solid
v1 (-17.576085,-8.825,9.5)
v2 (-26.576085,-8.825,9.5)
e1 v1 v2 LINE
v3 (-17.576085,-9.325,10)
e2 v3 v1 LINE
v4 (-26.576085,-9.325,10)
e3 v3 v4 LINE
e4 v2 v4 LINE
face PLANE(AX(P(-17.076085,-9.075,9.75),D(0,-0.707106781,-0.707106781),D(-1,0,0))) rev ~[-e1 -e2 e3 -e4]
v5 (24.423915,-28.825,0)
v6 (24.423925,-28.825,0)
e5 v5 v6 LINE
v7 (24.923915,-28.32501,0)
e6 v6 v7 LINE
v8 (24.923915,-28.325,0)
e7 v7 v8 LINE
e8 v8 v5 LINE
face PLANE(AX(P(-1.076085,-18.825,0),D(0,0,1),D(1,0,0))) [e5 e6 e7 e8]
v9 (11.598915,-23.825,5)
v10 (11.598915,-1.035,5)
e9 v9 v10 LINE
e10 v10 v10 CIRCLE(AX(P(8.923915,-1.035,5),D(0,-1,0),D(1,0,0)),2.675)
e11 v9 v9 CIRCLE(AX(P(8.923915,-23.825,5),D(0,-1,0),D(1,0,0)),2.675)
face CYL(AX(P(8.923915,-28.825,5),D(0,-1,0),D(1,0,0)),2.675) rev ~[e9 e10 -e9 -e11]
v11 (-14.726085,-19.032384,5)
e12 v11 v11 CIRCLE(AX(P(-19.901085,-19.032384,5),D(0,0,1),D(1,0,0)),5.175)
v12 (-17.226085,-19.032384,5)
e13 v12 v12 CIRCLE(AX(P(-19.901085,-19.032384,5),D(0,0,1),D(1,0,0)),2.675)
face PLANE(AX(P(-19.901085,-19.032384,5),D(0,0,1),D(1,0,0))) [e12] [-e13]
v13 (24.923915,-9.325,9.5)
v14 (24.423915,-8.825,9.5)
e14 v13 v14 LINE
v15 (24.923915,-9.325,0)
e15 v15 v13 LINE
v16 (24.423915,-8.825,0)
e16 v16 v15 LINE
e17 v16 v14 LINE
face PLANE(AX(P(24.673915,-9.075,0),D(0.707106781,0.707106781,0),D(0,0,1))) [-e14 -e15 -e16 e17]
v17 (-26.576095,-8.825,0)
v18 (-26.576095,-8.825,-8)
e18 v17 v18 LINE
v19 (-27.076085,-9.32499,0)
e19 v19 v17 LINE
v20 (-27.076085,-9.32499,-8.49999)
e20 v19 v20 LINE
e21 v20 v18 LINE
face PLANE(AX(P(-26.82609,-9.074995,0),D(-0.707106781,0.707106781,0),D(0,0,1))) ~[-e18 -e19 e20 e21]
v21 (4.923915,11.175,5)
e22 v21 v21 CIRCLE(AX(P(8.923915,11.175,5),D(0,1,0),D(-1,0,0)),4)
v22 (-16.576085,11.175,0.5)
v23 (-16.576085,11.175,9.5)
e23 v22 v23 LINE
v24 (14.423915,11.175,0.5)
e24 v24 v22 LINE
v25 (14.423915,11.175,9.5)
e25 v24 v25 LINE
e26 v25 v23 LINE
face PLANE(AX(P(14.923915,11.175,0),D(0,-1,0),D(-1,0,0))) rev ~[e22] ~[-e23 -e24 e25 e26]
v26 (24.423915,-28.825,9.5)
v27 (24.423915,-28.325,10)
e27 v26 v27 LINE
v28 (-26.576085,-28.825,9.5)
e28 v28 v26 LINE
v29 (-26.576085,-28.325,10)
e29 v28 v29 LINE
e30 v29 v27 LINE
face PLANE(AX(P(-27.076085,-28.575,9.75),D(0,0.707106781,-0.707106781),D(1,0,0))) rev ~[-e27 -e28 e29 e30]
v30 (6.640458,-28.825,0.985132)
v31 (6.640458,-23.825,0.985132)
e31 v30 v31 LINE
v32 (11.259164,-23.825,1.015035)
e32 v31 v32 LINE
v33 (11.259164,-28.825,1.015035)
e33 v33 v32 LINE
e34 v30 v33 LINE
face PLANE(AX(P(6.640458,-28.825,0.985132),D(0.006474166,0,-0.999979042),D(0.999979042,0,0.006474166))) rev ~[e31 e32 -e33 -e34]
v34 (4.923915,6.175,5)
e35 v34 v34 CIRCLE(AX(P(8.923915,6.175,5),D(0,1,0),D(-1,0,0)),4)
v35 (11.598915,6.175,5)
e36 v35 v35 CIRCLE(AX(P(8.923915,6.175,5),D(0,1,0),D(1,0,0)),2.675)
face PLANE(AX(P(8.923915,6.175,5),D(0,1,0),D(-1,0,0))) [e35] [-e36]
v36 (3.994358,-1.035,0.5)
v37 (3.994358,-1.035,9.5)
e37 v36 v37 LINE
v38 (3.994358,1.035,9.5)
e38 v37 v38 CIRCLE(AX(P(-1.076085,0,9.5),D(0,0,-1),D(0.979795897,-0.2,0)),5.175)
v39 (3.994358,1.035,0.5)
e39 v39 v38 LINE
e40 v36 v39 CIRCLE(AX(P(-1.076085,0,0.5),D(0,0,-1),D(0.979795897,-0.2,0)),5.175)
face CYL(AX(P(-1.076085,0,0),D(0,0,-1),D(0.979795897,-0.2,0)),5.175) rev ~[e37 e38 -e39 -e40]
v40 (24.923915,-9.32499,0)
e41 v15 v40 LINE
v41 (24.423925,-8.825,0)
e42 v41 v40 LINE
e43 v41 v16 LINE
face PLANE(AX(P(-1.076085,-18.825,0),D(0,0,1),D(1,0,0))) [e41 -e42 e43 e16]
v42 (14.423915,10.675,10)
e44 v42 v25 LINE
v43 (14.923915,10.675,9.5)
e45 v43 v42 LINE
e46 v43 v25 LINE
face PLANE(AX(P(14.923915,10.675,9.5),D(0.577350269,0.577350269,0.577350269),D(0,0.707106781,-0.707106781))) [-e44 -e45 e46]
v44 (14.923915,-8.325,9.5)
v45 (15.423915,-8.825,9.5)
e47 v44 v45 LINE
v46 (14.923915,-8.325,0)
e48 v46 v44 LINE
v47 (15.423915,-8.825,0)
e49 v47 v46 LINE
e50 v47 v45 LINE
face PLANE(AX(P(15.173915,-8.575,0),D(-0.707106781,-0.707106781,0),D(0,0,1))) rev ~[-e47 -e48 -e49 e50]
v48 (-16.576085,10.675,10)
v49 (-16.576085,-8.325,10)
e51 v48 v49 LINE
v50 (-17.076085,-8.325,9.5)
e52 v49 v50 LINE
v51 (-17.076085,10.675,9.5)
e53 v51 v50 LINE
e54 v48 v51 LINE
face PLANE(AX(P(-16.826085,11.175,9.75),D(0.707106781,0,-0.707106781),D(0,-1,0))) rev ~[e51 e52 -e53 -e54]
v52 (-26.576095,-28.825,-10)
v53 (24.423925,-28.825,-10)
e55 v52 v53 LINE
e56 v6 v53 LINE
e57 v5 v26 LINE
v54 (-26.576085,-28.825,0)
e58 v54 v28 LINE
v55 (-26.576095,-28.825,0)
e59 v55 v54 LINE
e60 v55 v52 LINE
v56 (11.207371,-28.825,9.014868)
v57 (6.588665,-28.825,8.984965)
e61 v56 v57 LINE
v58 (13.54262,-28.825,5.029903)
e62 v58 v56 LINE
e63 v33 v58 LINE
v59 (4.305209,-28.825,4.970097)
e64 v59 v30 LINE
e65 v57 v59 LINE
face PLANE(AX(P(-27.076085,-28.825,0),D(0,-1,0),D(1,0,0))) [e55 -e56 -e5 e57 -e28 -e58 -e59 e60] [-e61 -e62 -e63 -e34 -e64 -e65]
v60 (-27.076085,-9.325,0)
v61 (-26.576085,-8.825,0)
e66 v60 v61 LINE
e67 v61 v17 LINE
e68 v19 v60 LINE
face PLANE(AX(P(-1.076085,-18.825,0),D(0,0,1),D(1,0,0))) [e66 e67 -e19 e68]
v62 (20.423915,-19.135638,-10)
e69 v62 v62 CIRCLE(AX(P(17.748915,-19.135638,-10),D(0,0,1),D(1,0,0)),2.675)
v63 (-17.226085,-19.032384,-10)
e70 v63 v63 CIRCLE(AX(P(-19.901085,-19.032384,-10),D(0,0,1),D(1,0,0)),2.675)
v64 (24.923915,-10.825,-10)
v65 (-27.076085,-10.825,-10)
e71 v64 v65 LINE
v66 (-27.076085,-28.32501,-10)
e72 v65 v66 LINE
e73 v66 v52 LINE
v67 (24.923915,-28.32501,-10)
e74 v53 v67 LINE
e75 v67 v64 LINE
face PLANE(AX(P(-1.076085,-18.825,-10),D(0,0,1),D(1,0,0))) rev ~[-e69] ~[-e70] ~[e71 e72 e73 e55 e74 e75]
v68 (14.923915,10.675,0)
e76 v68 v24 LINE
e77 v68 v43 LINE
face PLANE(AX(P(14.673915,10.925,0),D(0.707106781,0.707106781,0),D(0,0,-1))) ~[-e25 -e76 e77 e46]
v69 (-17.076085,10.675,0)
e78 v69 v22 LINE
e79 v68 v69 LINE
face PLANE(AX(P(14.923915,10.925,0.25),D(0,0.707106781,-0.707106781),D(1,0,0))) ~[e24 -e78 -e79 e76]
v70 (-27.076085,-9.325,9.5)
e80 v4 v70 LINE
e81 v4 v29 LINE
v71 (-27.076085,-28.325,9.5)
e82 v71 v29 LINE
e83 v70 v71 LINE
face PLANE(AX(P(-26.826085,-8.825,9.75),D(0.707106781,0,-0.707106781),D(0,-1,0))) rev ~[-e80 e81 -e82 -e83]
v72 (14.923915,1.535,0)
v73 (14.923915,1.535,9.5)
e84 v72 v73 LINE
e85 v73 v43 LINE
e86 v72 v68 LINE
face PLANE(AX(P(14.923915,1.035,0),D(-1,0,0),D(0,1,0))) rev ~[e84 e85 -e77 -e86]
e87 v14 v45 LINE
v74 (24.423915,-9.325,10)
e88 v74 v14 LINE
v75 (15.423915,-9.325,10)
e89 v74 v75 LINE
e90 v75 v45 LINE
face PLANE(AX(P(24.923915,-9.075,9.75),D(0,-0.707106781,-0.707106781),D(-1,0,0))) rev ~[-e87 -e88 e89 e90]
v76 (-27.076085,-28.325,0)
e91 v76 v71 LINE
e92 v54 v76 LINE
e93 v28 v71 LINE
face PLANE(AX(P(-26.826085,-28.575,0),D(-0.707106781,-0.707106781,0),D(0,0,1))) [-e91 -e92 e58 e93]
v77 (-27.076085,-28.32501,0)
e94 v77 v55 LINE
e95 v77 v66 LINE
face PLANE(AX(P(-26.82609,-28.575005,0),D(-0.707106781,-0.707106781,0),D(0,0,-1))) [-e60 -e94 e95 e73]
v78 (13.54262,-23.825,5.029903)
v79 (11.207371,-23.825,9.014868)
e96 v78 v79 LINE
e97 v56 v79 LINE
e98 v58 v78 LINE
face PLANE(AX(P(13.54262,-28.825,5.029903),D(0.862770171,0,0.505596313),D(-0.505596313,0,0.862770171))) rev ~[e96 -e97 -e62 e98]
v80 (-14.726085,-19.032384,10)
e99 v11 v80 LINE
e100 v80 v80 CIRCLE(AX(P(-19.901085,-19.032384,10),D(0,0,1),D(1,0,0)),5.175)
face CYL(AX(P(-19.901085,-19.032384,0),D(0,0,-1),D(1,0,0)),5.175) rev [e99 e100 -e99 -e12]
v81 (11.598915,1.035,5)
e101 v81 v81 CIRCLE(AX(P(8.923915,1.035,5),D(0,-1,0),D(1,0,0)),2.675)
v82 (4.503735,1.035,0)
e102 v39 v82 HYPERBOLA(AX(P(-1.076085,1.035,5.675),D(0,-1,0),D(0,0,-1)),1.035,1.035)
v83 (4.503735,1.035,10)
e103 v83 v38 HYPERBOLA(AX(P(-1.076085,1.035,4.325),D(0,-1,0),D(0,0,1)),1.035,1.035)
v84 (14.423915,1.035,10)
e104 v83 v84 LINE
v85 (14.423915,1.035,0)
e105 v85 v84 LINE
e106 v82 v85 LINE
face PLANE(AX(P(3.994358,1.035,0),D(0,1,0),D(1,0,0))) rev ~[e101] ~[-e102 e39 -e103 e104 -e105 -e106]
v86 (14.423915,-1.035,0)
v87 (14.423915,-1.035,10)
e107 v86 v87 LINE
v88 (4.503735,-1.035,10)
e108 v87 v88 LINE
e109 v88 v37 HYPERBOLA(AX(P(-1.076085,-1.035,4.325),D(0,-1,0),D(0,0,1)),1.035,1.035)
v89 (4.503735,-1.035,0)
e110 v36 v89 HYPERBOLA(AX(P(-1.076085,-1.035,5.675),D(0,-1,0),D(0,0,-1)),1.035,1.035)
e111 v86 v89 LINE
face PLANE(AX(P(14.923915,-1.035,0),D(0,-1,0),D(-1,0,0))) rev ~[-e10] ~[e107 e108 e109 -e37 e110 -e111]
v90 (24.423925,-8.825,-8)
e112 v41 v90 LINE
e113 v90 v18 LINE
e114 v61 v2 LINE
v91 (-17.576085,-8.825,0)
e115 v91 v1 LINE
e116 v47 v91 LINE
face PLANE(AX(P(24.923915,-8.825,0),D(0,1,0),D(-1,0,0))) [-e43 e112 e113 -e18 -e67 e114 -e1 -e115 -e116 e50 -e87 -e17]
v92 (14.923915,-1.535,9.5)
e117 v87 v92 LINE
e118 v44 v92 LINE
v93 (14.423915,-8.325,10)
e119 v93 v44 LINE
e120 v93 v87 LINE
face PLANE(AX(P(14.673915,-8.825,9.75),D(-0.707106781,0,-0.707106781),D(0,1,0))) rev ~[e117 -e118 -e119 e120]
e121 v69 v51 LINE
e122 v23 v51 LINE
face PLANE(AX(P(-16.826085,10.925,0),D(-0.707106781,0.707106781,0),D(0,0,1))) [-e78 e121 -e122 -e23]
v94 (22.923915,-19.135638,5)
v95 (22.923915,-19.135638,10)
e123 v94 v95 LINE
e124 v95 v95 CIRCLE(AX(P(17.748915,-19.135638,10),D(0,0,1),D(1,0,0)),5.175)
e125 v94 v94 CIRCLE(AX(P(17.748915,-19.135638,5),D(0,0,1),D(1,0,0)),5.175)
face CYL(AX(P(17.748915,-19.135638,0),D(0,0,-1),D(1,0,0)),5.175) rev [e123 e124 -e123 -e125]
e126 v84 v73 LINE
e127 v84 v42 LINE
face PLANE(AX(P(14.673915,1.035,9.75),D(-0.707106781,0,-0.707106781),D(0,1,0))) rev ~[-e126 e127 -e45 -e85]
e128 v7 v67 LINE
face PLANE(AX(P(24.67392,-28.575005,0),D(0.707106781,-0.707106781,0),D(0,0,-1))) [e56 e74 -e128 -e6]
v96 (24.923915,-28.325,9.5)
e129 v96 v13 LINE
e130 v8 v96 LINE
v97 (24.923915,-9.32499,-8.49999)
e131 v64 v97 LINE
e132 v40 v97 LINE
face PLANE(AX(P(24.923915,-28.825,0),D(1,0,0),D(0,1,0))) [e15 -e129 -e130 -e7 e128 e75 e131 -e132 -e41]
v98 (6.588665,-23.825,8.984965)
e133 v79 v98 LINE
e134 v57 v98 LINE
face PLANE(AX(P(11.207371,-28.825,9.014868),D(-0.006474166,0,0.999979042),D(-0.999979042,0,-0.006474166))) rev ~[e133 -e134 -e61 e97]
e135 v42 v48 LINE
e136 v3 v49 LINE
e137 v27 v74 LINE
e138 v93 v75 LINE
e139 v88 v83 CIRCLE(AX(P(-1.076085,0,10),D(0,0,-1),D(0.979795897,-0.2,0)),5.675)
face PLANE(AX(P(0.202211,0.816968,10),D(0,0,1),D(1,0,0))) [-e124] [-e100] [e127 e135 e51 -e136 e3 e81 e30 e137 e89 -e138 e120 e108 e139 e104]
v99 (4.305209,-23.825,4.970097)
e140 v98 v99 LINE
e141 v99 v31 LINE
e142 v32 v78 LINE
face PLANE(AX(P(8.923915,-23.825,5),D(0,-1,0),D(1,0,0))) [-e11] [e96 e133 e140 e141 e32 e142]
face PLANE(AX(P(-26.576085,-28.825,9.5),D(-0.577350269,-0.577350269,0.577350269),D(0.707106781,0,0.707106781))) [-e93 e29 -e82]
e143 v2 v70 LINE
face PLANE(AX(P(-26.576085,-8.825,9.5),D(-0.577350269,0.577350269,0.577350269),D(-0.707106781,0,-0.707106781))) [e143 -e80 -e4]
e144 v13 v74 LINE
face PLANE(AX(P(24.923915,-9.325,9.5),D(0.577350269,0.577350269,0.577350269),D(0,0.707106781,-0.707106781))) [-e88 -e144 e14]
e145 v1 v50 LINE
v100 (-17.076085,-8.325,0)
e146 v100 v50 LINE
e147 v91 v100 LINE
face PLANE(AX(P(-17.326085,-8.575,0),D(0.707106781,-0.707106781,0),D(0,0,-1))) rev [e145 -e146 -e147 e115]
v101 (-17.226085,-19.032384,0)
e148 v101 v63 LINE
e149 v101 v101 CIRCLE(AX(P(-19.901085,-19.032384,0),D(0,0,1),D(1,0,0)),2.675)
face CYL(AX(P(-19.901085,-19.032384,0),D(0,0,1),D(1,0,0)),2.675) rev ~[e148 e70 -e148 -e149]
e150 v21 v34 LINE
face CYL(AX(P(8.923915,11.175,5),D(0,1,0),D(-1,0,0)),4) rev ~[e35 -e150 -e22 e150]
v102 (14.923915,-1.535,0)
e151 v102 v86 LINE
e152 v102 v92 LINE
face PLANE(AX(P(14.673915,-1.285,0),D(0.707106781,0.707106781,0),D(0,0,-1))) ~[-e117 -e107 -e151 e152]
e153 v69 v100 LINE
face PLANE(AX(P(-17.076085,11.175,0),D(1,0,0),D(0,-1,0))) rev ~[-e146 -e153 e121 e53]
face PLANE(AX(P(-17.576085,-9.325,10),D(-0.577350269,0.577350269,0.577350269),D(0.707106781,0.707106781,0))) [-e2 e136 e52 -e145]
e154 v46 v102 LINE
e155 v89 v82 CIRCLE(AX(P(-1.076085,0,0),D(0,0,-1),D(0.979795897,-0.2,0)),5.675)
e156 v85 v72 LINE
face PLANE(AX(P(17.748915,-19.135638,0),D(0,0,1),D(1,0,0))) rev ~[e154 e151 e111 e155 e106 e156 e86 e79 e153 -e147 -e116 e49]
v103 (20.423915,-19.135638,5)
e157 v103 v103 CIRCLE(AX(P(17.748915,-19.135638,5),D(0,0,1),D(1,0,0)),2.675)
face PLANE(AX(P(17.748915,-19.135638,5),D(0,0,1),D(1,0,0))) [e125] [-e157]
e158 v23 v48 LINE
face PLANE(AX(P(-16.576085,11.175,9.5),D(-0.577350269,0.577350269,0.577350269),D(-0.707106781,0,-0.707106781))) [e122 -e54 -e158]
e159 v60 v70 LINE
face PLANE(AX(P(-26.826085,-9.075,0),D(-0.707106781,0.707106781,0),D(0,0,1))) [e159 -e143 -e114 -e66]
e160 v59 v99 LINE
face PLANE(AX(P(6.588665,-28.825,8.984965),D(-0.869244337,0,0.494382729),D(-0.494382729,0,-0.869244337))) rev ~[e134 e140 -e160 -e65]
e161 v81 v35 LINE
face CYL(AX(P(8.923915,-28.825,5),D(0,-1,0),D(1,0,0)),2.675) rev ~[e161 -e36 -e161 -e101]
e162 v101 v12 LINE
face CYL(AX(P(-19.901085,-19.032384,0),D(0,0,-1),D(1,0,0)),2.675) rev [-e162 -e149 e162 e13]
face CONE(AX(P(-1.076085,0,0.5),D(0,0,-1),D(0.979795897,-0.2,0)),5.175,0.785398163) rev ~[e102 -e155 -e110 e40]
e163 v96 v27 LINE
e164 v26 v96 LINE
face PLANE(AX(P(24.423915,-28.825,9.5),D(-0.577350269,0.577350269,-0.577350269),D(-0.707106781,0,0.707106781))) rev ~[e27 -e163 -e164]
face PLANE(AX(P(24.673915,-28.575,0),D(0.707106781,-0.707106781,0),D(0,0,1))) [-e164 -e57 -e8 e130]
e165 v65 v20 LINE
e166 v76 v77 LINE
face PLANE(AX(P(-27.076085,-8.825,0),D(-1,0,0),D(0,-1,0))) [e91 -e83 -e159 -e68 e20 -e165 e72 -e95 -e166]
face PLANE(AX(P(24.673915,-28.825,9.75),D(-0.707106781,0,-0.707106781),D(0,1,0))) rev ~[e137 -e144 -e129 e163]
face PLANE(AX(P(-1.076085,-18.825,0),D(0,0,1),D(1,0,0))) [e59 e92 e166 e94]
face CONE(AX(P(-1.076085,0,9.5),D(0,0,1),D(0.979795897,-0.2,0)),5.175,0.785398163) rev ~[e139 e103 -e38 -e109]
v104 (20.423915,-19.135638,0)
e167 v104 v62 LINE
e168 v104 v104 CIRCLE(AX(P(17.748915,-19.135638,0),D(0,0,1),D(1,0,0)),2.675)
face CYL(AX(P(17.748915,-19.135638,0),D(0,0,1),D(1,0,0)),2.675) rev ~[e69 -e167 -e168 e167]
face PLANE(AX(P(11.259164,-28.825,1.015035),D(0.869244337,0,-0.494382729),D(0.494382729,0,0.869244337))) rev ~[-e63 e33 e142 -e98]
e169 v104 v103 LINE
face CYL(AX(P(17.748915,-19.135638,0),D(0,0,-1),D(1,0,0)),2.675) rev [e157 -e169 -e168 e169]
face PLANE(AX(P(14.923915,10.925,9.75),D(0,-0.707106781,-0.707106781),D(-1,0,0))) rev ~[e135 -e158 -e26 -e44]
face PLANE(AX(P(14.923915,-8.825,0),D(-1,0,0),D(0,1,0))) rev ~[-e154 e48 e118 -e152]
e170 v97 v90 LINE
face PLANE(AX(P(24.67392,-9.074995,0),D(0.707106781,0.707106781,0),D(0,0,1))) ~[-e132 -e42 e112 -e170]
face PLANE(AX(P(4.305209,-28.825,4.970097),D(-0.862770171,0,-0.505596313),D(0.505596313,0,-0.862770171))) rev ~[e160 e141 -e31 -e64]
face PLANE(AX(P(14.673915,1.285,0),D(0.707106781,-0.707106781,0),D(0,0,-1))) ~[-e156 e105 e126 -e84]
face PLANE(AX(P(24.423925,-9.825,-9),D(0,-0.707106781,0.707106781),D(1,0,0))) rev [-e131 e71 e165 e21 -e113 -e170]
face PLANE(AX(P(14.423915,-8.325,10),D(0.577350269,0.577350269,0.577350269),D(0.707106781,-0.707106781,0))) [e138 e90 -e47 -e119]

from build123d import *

# Parameters (mm, degrees)
F0_R      = 5.175
F1_DEPTH  = 10
F0_R_2    = 2.675
F2_DEPTH  = 5
F3_DEPTH  = 5
F4_R      = 2.675
F5_DEPTH  = 40
F6_DEPTH  = 5
F7_R      = 4
F7_R_2    = 2.675
F8_DEPTH  = 5
F9_SIZE   = 0.5
F10_DEPTH = 10
F11_DEPTH = 10
F12_SIZE  = 0.49999
F13_SIZE  = 2


# Not quite as in the source:
# - a fillet or chamfer is up to 0.001 mm smaller than in the source, because OpenCascade refuses the exact size


with BuildPart() as f1:
    # F0 (on Top) → F1 (new body)
    with BuildSketch(Plane.XY):
        with BuildLine():
            Line((14.923914507, 11.175), (-17.076085493, 11.175))
            Line((-17.076085493, 11.175), (-17.076085493, -8.825))
            Line((-17.076085493, -8.825), (14.923914507, -8.825))
            Line((14.923914507, -8.825), (14.923914507, -1.035))
            Line((14.923914507, -1.035), (3.9943582746, -1.035))
            ThreePointArc((3.9943582746, -1.035), (-6.251085493, 0), (3.9943582746, 1.035))
            Line((3.9943582746, 1.035), (14.923914507, 1.035))
            Line((14.923914507, 1.035), (14.923914507, 11.175))
        make_face()
        Polygon((14.923914507, -8.825), (-17.076085493, -8.825), (-27.076085493, -8.825), (-27.076085493, -28.825), (-17.076085493, -28.825), (14.923914507, -28.825), (24.923914507, -28.825), (24.923914507, -8.825), align=None)
        with Locations((-19.901085493, -19.0323841524)):
            Circle(F0_R, mode=Mode.SUBTRACT)
        with Locations((17.748914507, -19.1356375643)):
            Circle(F0_R, mode=Mode.SUBTRACT)
    extrude(amount=F1_DEPTH)

    # F0 (on Top) → F2 (join)
    with BuildSketch(Plane.XY):
        with Locations((-19.901085493, -19.0323841524)):
            Circle(F0_R)
        with Locations((-19.901085493, -19.0323841524)):
            Circle(F0_R_2, mode=Mode.SUBTRACT)
    extrude(amount=F2_DEPTH)

    # F0 (on Top) → F3 (join)
    with BuildSketch(Plane.XY):
        with Locations((17.748914507, -19.1356375643)):
            Circle(F0_R)
        with Locations((17.748914507, -19.1356375643)):
            Circle(F0_R_2, mode=Mode.SUBTRACT)
    extrude(amount=F3_DEPTH)

    # F4 (on face) → F5 (cut)
    with BuildSketch(Plane.XZ.offset(28.825)):
        with Locations((8.923914507, 5)):
            Circle(F4_R)
    extrude(amount=-F5_DEPTH, mode=Mode.SUBTRACT)

    # F4 (on face) → F6 (cut)
    with BuildSketch(Plane.XZ.offset(28.825)):
        Polygon((4.3052091527, 4.9700971099), (6.6404584923, 0.9851323855), (11.2591638467, 1.0150352756), (13.5426198614, 5.0299028901), (11.2073705218, 9.0148676145), (6.5886651674, 8.9849647244), align=None)
        with Locations((8.923914507, 5)):
            Circle(F4_R, mode=Mode.SUBTRACT)
    extrude(amount=-F6_DEPTH, mode=Mode.SUBTRACT)

    # F7 (on face) → F8 (cut)
    with BuildSketch(Plane(origin=(0, 11.175, 0), x_dir=(-1, 0, 0), z_dir=(0, 1, 0))):
        with Locations((-8.923914507, 5)):
            Circle(F7_R)
        with Locations((-8.923914507, 5)):
            Circle(F7_R_2, mode=Mode.SUBTRACT)
    extrude(amount=-F8_DEPTH, mode=Mode.SUBTRACT)

    # F9
    f9_edges = [f1.edges().sort_by_distance(p)[0] for p in [
        (-27.076085, -18.825, 10),
        (-22.076085, -8.825, 10),
        (-17.076085, 1.175, 10),
        (-1.076085, 11.175, 10),
        (14.923915, 6.105, 10),
        (14.923915, -4.93, 10),
        (19.923915, -8.825, 10),
        (24.923915, -18.825, 10),
        (24.923915, -8.825, 5),
        (14.923915, -8.825, 5),
        (14.923915, -1.035, 5),
        (14.923915, 1.035, 5),
        (14.923915, 11.175, 5),
        (-17.076085, 11.175, 5),
        (-17.076085, -8.825, 5),
        (-27.076085, -8.825, 5),
        (-27.076085, -28.825, 5),
        (24.923915, -28.825, 5),
        (-6.251085, 0, 10),
        (-1.076085, -28.825, 10),
        (-6.251085, 0, 0),
        (-1.076085, 11.175, 0),
    ]]
    chamfer(f9_edges, length=F9_SIZE)

    # F0 (on Top) → F10 (join)
    with BuildSketch(Plane.XY):
        Polygon((14.923914507, -8.825), (-17.076085493, -8.825), (-27.076085493, -8.825), (-27.076085493, -28.825), (-17.076085493, -28.825), (14.923914507, -28.825), (24.923914507, -28.825), (24.923914507, -8.825), align=None)
        with Locations((-19.901085493, -19.0323841524)):
            Circle(F0_R, mode=Mode.SUBTRACT)
        with Locations((17.748914507, -19.1356375643)):
            Circle(F0_R, mode=Mode.SUBTRACT)
    extrude(amount=-F10_DEPTH)

    # F0 (on Top) → F11 (join)
    with BuildSketch(Plane.XY):
        with Locations((17.748914507, -19.1356375643)):
            Circle(F0_R)
        with Locations((17.748914507, -19.1356375643)):
            Circle(F0_R_2, mode=Mode.SUBTRACT)
        with Locations((-19.901085493, -19.0323841524)):
            Circle(F0_R)
        with Locations((-19.901085493, -19.0323841524)):
            Circle(F0_R_2, mode=Mode.SUBTRACT)
    extrude(amount=-F11_DEPTH)

    # F12 (size 0.5 in the source; OpenCascade refuses exactly that, so slightly less here)
    f12_edges = [f1.edges().sort_by_distance(p)[0] for p in [
        (24.923915, -8.825, -5),
        (-27.076085, -8.825, -5),
        (24.923915, -28.825, -5),
        (-27.076085, -28.825, -5),
    ]]
    chamfer(f12_edges, length=F12_SIZE)

    # F13
    f13_edges = [f1.edges().sort_by_distance(p)[0] for p in [
        (-1.076085, -8.825, -10),
    ]]
    chamfer(f13_edges, length=F13_SIZE)


solid = f1.part
